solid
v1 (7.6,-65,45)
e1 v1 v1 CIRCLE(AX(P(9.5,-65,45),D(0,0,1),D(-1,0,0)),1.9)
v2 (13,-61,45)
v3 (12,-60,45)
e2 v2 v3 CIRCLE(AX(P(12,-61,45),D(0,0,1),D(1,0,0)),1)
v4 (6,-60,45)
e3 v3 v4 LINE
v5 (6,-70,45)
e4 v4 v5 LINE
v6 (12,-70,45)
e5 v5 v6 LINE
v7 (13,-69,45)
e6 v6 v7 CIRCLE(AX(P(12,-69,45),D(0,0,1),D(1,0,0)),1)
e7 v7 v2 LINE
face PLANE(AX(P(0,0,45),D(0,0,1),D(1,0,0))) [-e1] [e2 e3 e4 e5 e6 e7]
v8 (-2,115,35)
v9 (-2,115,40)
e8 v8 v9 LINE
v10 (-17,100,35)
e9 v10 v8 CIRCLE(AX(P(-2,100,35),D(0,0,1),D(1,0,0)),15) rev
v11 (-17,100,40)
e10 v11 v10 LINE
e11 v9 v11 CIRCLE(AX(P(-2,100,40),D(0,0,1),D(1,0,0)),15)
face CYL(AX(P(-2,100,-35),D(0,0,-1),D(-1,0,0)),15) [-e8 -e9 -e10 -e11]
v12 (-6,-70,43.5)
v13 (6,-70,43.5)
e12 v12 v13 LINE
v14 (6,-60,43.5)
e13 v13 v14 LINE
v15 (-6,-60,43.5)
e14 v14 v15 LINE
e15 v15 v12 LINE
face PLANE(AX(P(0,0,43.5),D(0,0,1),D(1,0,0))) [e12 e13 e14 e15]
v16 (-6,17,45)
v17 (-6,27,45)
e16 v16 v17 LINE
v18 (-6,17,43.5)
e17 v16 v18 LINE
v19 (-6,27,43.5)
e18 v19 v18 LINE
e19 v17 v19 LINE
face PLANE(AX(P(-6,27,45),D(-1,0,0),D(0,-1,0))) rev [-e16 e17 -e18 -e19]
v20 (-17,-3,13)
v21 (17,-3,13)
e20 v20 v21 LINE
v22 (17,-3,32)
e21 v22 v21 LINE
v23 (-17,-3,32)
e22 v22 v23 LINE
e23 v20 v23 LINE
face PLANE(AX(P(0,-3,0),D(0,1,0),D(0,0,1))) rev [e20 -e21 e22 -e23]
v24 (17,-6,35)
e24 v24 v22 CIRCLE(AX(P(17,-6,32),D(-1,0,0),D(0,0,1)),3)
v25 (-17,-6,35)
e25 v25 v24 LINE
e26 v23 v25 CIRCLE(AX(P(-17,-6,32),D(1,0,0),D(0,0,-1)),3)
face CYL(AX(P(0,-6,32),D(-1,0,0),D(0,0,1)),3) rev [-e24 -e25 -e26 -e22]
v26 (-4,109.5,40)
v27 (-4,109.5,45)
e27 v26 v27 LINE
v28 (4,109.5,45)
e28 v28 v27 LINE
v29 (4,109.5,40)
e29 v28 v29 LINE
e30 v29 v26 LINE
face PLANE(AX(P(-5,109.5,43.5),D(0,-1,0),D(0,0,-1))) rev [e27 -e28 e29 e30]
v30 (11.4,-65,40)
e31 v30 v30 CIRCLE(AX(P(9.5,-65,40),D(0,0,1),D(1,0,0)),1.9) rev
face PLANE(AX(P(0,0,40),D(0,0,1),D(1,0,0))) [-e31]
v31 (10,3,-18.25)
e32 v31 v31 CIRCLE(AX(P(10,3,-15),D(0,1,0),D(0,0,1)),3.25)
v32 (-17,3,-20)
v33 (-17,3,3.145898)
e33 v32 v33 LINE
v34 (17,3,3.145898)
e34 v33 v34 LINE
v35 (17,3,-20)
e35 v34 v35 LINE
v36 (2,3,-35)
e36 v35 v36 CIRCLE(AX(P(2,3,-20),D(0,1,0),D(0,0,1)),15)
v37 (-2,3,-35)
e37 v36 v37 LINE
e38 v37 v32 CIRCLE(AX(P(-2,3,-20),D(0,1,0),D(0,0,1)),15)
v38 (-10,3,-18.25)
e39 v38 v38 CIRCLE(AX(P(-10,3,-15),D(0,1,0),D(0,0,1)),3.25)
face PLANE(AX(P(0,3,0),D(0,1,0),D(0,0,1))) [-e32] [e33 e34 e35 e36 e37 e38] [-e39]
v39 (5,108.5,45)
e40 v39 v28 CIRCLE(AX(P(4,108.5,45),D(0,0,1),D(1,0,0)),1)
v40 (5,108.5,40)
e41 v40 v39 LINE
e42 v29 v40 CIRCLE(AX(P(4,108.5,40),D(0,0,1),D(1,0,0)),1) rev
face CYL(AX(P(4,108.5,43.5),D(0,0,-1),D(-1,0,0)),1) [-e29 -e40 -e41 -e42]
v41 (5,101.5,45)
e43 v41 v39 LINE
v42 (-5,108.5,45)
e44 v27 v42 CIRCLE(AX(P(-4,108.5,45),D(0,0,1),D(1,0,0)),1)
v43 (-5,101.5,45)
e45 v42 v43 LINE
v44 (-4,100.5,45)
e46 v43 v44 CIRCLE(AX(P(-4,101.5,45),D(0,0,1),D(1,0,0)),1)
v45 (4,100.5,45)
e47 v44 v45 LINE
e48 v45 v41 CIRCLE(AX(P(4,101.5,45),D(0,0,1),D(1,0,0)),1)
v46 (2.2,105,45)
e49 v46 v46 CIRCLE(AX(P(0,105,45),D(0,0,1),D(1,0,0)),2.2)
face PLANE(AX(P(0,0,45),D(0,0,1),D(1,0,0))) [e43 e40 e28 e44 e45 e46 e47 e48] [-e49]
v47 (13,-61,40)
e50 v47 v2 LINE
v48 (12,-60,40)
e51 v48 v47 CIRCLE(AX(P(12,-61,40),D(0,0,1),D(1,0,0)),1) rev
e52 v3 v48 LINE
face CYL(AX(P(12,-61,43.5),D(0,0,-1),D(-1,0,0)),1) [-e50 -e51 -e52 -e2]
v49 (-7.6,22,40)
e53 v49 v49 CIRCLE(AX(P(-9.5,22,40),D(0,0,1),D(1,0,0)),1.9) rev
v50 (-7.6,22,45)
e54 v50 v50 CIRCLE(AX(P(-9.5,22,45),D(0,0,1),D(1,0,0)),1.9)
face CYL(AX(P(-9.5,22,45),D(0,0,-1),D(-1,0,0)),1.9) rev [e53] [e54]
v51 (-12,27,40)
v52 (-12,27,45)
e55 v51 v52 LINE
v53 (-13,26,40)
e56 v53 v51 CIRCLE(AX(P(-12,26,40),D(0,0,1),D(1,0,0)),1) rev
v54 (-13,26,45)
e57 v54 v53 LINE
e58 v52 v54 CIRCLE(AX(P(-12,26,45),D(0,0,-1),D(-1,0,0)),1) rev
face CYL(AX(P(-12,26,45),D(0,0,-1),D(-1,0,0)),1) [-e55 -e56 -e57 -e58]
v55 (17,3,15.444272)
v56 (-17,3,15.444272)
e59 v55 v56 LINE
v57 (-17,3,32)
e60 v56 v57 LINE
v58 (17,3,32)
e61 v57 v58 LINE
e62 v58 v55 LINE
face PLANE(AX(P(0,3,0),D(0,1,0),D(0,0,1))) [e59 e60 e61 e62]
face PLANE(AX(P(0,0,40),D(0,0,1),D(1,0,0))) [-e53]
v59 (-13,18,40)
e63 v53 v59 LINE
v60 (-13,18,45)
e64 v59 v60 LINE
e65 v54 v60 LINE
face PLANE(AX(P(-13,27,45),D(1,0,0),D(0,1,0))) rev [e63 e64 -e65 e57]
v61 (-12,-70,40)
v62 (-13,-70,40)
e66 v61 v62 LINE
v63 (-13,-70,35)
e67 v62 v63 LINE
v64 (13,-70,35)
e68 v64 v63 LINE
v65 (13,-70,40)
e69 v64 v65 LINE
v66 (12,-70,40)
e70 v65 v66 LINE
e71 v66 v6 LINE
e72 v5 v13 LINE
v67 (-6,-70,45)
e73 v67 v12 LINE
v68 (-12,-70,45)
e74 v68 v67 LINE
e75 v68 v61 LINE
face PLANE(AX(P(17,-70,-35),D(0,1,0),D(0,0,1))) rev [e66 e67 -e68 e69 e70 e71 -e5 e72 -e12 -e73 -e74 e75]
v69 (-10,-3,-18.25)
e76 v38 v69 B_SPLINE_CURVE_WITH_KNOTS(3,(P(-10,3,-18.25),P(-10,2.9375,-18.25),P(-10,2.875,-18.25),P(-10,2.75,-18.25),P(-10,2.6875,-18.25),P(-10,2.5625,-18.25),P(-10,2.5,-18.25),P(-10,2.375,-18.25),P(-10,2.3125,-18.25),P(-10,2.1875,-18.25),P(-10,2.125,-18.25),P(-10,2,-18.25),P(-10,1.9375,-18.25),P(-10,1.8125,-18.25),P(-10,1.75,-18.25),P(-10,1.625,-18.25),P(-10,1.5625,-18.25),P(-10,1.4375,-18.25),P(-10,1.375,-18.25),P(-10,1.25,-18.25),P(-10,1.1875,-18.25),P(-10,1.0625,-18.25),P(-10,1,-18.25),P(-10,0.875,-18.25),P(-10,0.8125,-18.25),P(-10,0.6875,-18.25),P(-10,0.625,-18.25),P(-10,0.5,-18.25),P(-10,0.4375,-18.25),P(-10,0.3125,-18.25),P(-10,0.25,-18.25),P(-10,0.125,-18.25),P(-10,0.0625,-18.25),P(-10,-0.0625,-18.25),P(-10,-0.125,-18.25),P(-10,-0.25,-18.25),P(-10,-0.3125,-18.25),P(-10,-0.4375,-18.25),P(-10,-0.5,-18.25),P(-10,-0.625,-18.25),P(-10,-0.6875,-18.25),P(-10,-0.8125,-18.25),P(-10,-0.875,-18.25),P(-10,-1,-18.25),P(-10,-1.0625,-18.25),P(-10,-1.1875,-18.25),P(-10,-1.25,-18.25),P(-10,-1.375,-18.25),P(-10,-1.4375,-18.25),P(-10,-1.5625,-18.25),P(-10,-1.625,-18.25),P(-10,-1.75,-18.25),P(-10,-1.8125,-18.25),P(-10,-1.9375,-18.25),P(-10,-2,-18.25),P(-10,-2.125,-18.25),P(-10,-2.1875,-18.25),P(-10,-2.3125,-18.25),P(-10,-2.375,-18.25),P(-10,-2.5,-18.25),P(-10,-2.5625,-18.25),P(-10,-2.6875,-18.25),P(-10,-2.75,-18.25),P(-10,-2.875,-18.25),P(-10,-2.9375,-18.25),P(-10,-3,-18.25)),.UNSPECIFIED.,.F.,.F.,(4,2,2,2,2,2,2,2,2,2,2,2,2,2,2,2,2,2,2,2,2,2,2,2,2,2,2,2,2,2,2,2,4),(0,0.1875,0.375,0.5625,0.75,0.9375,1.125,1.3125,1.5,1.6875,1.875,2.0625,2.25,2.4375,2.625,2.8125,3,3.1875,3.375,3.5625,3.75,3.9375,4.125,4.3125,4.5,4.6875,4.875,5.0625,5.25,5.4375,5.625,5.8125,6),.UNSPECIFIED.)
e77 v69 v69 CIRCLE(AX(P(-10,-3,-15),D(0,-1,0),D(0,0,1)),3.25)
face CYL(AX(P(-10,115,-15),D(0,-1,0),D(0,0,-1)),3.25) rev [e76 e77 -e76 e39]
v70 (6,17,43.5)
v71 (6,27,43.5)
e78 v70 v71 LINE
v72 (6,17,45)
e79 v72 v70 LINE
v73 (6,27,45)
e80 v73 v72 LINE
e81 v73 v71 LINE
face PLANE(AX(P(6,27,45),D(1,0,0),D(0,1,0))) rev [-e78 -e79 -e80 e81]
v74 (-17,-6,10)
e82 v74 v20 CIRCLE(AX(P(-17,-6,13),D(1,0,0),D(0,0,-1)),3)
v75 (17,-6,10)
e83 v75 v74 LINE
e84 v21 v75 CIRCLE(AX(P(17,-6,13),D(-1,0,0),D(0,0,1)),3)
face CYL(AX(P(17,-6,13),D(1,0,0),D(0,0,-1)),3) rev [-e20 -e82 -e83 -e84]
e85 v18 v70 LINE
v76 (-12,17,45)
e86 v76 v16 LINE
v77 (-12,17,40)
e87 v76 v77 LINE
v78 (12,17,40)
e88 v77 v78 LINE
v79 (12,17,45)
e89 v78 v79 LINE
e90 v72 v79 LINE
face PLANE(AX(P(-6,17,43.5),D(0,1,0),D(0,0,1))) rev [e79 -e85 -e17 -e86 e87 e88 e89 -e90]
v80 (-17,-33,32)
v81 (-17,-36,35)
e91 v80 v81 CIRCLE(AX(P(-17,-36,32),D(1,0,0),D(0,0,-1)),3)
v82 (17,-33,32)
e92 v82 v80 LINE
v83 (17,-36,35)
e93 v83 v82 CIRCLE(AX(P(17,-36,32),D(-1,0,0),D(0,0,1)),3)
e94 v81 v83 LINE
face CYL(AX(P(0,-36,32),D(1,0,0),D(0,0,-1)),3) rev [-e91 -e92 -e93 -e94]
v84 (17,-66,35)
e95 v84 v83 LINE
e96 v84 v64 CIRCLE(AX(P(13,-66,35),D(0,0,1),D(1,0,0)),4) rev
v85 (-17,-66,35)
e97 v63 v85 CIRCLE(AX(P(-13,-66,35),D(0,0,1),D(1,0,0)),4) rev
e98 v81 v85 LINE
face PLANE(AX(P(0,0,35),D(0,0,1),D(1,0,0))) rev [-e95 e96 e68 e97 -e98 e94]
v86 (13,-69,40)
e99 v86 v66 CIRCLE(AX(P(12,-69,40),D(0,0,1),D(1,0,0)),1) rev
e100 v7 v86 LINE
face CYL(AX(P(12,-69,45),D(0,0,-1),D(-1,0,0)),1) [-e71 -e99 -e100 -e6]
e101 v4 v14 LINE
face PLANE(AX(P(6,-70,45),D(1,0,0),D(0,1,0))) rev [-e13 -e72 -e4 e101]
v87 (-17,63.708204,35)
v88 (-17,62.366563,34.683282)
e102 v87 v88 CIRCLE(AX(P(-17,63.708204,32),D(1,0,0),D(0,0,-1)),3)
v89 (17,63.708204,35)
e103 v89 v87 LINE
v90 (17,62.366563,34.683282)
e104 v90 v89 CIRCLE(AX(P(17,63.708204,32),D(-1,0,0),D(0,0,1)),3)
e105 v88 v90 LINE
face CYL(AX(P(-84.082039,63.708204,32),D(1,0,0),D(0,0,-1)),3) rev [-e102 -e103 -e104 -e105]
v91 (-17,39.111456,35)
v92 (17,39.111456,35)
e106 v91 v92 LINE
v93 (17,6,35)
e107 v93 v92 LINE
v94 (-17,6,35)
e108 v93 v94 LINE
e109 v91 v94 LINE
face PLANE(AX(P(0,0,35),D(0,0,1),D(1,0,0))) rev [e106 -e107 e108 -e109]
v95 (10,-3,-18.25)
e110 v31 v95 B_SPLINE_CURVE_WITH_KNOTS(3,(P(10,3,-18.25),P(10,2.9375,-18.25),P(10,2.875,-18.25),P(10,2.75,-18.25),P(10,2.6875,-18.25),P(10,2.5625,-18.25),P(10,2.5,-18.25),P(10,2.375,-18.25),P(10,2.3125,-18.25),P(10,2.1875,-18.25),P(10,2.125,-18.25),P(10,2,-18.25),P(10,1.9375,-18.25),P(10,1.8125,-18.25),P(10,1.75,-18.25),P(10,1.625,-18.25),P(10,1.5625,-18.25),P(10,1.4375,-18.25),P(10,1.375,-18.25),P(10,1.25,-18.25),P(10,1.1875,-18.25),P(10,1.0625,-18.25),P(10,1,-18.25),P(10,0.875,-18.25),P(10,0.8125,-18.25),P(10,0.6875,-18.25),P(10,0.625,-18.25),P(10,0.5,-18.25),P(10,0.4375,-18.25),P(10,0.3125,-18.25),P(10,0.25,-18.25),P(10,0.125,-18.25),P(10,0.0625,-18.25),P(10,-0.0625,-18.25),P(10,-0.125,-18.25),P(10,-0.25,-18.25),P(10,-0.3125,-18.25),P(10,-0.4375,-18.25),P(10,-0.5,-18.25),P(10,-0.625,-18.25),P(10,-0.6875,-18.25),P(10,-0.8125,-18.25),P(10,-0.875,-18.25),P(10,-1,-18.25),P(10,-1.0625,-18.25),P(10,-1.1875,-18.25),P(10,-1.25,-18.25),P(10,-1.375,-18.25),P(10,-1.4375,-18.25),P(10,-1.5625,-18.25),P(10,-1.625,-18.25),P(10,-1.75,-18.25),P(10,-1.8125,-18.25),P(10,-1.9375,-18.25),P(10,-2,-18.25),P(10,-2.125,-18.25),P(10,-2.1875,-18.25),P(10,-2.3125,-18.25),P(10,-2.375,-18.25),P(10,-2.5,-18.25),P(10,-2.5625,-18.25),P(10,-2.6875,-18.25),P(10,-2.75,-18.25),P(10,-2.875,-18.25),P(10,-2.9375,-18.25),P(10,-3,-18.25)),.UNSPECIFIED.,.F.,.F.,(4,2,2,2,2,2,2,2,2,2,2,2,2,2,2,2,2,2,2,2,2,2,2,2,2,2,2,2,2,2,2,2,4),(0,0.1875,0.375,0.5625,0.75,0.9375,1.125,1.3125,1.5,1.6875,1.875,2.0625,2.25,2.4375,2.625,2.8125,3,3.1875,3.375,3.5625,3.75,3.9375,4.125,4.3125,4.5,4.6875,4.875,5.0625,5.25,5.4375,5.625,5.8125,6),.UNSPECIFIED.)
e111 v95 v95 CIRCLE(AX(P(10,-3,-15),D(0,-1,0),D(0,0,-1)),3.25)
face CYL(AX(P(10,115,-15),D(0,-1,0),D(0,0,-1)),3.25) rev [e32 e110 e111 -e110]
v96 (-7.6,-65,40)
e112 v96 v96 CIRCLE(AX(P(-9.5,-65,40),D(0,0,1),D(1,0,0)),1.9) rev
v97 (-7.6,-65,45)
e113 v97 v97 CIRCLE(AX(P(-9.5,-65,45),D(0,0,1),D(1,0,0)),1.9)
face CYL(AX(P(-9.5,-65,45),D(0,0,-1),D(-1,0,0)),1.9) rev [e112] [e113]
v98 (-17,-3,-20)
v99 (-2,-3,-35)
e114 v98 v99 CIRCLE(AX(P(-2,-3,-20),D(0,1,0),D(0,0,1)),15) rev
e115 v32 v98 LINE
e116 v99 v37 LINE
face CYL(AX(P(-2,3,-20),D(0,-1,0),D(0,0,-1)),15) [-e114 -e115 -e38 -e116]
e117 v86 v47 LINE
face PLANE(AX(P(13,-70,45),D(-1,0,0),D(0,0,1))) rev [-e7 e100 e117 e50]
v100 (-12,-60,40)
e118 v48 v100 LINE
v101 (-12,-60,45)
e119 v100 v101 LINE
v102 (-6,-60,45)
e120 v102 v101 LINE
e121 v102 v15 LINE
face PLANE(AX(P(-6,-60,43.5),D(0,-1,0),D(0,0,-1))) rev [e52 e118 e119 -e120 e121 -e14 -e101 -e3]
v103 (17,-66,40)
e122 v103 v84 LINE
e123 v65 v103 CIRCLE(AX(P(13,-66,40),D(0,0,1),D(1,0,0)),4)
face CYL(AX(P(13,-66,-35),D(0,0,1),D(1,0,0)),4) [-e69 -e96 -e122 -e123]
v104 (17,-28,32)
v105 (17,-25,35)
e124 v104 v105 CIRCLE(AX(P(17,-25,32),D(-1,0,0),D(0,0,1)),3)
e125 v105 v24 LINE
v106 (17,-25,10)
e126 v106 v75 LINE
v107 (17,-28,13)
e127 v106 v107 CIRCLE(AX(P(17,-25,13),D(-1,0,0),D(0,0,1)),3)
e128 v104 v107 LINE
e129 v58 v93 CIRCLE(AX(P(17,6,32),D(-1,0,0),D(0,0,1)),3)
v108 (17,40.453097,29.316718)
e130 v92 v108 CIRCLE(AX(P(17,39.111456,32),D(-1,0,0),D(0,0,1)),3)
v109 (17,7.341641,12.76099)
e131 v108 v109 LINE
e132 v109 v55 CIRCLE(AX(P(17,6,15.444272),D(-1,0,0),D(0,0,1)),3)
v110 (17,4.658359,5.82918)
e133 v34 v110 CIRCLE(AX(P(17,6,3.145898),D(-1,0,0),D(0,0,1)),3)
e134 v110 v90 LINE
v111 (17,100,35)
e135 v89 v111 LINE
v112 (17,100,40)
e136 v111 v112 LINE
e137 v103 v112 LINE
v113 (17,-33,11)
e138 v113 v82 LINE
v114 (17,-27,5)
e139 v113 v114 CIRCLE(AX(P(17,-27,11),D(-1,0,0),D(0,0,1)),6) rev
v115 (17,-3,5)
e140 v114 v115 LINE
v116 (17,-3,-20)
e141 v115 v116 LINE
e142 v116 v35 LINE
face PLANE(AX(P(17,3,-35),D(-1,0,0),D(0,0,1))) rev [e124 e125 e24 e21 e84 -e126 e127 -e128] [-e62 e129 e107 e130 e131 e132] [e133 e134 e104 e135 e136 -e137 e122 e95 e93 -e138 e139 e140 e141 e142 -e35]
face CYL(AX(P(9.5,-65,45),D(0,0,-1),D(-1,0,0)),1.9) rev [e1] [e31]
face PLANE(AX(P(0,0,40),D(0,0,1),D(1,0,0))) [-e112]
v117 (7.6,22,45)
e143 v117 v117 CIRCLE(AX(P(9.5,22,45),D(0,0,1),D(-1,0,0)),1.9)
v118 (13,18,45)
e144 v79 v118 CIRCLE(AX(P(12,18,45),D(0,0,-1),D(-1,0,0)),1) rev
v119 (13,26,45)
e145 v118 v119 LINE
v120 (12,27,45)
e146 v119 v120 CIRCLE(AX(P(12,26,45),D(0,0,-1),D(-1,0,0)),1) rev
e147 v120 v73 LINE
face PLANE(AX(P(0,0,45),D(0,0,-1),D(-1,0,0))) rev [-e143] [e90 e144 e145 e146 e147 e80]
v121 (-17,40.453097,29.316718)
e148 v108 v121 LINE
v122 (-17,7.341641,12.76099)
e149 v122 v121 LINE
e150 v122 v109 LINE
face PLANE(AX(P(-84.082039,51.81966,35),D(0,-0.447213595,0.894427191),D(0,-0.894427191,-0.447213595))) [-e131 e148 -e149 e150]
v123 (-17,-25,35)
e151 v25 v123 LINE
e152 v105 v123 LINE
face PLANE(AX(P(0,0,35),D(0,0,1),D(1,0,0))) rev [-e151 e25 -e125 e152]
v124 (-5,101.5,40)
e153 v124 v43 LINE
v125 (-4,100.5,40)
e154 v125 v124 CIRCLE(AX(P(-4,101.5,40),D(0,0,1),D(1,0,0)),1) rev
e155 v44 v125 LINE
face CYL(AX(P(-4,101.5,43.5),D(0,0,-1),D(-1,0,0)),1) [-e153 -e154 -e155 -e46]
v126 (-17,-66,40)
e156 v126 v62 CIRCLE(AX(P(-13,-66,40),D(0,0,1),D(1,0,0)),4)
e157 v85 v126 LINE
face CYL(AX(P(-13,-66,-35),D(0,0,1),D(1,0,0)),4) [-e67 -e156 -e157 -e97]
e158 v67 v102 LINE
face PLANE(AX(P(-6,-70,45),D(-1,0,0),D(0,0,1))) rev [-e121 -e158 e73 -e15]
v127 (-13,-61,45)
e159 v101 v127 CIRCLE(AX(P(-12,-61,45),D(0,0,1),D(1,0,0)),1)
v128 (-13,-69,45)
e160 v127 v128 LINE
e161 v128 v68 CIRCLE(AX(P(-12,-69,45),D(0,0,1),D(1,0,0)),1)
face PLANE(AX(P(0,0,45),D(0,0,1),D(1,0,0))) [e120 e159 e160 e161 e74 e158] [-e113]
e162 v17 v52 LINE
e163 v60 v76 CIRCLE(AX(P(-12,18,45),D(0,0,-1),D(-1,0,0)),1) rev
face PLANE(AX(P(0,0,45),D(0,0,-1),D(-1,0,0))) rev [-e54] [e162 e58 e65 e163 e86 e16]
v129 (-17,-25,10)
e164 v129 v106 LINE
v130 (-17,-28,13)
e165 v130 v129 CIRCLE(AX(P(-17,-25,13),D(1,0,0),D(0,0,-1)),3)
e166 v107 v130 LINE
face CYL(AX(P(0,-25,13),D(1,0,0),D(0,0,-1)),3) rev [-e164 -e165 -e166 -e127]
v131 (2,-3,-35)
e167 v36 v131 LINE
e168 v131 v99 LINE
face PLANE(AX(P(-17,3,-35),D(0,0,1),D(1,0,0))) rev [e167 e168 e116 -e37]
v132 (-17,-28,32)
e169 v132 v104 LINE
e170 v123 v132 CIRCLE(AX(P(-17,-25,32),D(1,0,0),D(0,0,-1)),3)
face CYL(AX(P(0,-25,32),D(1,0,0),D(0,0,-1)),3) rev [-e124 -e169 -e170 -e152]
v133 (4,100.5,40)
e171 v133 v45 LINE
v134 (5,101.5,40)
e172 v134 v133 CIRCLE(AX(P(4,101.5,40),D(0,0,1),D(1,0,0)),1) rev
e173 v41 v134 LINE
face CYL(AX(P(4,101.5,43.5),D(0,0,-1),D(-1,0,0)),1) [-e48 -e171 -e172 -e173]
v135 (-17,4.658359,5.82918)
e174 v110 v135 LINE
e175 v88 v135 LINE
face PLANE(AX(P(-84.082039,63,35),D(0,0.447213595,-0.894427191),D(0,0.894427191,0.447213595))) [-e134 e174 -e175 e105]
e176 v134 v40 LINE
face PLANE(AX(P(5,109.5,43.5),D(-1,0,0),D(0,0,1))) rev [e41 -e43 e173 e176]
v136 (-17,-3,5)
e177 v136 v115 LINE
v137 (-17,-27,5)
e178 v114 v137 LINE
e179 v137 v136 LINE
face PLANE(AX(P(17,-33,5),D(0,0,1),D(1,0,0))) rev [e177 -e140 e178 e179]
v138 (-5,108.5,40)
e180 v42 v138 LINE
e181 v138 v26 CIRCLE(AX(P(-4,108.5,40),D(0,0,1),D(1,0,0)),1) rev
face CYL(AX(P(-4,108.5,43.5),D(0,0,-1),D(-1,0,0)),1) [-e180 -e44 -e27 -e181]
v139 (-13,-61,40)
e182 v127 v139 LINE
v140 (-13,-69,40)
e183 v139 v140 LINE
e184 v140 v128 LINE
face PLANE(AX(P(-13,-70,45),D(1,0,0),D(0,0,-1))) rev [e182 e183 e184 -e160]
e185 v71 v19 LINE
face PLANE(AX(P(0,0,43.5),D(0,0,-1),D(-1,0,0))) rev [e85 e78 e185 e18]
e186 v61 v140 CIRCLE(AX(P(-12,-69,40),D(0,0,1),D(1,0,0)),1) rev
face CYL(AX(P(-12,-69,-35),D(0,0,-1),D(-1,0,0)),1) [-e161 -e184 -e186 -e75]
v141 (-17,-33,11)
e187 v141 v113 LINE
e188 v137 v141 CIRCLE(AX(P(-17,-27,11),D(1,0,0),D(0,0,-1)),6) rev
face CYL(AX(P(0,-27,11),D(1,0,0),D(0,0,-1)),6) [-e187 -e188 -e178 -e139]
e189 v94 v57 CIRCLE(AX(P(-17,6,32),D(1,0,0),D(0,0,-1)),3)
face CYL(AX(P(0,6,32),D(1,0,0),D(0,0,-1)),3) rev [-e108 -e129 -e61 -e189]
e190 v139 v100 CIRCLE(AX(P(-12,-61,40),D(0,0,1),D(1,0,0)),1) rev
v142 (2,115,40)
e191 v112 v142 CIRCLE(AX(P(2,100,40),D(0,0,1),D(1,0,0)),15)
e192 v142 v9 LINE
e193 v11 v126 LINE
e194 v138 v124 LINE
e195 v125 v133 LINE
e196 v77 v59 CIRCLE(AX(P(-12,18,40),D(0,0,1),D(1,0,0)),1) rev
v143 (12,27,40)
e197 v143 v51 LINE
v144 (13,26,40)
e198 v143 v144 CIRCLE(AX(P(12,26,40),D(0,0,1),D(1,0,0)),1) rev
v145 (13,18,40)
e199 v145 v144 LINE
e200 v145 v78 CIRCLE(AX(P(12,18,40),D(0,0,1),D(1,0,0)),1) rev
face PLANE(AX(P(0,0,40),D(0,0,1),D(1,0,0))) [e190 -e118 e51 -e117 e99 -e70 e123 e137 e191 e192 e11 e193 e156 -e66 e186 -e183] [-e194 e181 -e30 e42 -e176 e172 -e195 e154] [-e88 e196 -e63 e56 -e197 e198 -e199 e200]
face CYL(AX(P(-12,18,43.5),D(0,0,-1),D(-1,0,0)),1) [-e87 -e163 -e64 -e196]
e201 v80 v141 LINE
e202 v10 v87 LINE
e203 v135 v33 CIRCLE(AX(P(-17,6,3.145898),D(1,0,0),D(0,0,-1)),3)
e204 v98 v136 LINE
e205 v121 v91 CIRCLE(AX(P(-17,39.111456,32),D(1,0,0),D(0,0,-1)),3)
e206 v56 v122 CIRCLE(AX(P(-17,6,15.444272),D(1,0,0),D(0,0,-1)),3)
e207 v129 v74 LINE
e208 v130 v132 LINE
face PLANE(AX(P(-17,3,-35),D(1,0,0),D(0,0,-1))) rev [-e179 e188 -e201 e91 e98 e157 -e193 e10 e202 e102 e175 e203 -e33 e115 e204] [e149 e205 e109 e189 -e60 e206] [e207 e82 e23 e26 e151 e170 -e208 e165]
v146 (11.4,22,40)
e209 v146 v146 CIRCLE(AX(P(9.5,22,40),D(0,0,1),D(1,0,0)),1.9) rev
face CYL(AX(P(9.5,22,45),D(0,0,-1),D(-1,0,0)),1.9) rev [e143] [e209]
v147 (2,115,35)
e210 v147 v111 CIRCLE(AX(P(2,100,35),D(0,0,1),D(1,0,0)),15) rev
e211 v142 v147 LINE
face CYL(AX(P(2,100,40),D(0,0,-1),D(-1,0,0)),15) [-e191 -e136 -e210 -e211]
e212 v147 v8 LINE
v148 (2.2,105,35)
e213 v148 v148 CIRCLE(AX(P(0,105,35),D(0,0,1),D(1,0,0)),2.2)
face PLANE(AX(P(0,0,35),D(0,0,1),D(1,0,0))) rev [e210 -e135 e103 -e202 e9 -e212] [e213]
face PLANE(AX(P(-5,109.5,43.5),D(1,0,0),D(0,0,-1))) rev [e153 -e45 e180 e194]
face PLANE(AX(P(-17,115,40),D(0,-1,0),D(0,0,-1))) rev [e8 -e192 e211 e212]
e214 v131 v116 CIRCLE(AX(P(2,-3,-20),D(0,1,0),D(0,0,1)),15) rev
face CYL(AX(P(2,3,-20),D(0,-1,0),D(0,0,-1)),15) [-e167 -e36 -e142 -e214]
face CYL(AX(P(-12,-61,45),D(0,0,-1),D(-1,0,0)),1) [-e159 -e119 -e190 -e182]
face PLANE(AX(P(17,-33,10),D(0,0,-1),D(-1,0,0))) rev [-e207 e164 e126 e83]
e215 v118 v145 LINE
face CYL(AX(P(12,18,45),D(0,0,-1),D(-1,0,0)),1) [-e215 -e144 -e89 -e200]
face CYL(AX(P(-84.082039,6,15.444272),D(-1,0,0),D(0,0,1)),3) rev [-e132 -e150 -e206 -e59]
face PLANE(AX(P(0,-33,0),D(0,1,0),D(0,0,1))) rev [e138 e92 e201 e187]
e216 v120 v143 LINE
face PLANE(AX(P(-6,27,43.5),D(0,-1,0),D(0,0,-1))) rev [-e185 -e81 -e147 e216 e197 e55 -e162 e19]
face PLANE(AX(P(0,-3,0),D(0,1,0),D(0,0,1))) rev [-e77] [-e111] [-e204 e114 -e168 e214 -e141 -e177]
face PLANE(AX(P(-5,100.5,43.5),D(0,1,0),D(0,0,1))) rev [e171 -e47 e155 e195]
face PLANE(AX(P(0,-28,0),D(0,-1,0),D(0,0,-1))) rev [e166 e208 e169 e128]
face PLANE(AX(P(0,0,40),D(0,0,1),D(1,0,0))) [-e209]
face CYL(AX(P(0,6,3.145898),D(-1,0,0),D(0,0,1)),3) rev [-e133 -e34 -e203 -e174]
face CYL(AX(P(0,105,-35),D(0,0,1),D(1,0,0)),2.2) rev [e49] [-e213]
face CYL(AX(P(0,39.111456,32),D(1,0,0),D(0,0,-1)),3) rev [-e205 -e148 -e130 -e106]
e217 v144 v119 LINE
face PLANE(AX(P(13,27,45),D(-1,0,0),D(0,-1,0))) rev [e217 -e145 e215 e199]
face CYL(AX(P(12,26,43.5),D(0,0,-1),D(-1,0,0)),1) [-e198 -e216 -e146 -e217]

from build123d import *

# Parameters (mm, degrees)
EXTRUDE_1_DEPTH      = 3
EXTRUDE_1_DEPTH_BACK = 3
SKETCH_1_W           = 34
SKETCH_1_H           = 70
SKETCH_3_W           = 34
SKETCH_3_H           = 230
EXTRUDE_2_DEPTH      = 5
SKETCH_4_W           = 34
SKETCH_4_H           = 5
EXTRUDE_3_DEPTH      = 30
EXTRUDE_START        = -5
EXTRUDE_4_OUTLINE_W  = 34
EXTRUDE_4_OUTLINE_H  = 25
EXTRUDE_4_DEPTH      = 5
SKETCH_7_R           = 2.2
CUT_EXTRUDE_1_DEPTH  = 139.343774706
SKETCH_9_R           = 3.25
CUT_EXTRUDE_3_DEPTH  = 126.749751491
EXTRUDE_5_DEPTH      = 34
SKETCH_12_W          = 37
SKETCH_12_H          = 52.36766615
CUT_EXTRUDE_5_DEPTH  = 139.343774706
EXTRUDE_START_2      = 3.5
SKETCH_13_W          = 12
SKETCH_13_H          = 10
SKETCH_13_W_2        = 10
SKETCH_13_H_2        = 9
SKETCH_13_R          = 2.2
EXTRUDE_6_DEPTH      = 3.5
EXTRUDE_START_3      = 1.5
SKETCH_14_W          = 10
SKETCH_14_H          = 9
SKETCH_14_R          = 2.2
EXTRUDE_7_DEPTH      = 1.5
SKETCH_15_W          = 7
SKETCH_15_H          = 10
SKETCH_15_R          = 1.9
EXTRUDE_8_DEPTH      = 5
FILLET_2_R           = 15
FILLET_3_R           = 4
FILLET_4_R           = 3
FILLET_5_R           = 6
FILLET_6_R           = 1


# Read off the part's stored shape, not the designer's step: 凸台-拉伸4
with BuildPart() as part:
    # 草图1 → 凸台-拉伸1 (new, two sides: drawn at the far end of the back side and taken through both)
    with BuildSketch(Plane(origin=(0, 0, 0), x_dir=(1, 0, 0), z_dir=(0, 1, 0)).offset(-EXTRUDE_1_DEPTH_BACK)):
        Rectangle(SKETCH_1_W, SKETCH_1_H)
    extrude(amount=EXTRUDE_1_DEPTH + EXTRUDE_1_DEPTH_BACK)

    # 草图3 → 凸台-拉伸2 (add)
    with BuildSketch(Plane.XY.offset(35)):
        Rectangle(SKETCH_3_W, SKETCH_3_H)
    extrude(amount=EXTRUDE_2_DEPTH)

    # 草图4 → 凸台-拉伸3 (add)
    with BuildSketch(Plane.XZ.offset(3)):
        with Locations((0, 7.5)):
            Rectangle(SKETCH_4_W, SKETCH_4_H)
    extrude(amount=EXTRUDE_3_DEPTH)

    # 凸台-拉伸4 outline → 凸台-拉伸4 (add)
    with BuildSketch(Plane.XZ.offset(33).offset(EXTRUDE_START)):
        with Locations((0, 22.5)):
            Rectangle(EXTRUDE_4_OUTLINE_W, EXTRUDE_4_OUTLINE_H)
    extrude(amount=EXTRUDE_4_DEPTH)

    # 草图7 → 切除-拉伸1 (cut, through all)
    with BuildSketch(Plane.XY.offset(40)):
        with Locations((0, -105)):
            Circle(SKETCH_7_R)
        with Locations((0, 105)):
            Circle(SKETCH_7_R)
    extrude(amount=-CUT_EXTRUDE_1_DEPTH, mode=Mode.SUBTRACT)

    # 草图9 → 切除-拉伸3 (cut, through all)
    with BuildSketch(Plane.XZ.offset(3)):
        with Locations(Location((10, -15, 0), (0, 0, 270))):
            Circle(SKETCH_9_R)
        with Locations(Location((-10, -15, 0), (0, 0, 270))):
            Circle(SKETCH_9_R)
    extrude(amount=-CUT_EXTRUDE_3_DEPTH, mode=Mode.SUBTRACT)

    # 草图10 → 凸台-拉伸5 (add)
    with BuildSketch(Plane(origin=(17, 0, 0), x_dir=(0, 0, -1), z_dir=(1, 0, 0))):
        Polygon((-35, 51.819660113), (-35, 63), (-5, 3), (-10.590169944, 3), align=None)
    extrude(amount=-EXTRUDE_5_DEPTH)

    # 草图12 → 切除-拉伸5 (cut, through all)
    with BuildSketch(Plane.XY.offset(40)):
        with Locations((-1.5, -96.183833075)):
            Rectangle(SKETCH_12_W, SKETCH_12_H)
    extrude(amount=-CUT_EXTRUDE_5_DEPTH, mode=Mode.SUBTRACT)

    # 草图13 → 凸台-拉伸6 (add)
    # profile 1 of 3: a face of its own
    with BuildSketch(Plane.XY.offset(40).offset(EXTRUDE_START_2)):
        with Locations((0, -65)):
            Rectangle(SKETCH_13_W, SKETCH_13_H)
    # profile 2 of 3: a face of its own
    with BuildSketch(Plane.XY.offset(40).offset(EXTRUDE_START_2)):
        with Locations((0, 22)):
            Rectangle(SKETCH_13_W, SKETCH_13_H)
    # profile 3 of 3: a face of its own
    with BuildSketch(Plane.XY.offset(40).offset(EXTRUDE_START_2)):
        with Locations((0, 105)):
            Rectangle(SKETCH_13_W_2, SKETCH_13_H_2)
        with Locations((0, 105)):
            Circle(SKETCH_13_R, mode=Mode.SUBTRACT)
    extrude(amount=-EXTRUDE_6_DEPTH)

    # 草图14 → 凸台-拉伸7 (add)
    with BuildSketch(Plane.XY.offset(43.5).offset(EXTRUDE_START_3)):
        with Locations((0, 105)):
            Rectangle(SKETCH_14_W, SKETCH_14_H)
        with Locations((0, 105)):
            Circle(SKETCH_14_R, mode=Mode.SUBTRACT)
    extrude(amount=-EXTRUDE_7_DEPTH)

    # 草图15 → 凸台-拉伸8 (add)
    # profile 1 of 4: a face of its own
    with BuildSketch(Plane.XY.offset(40)):
        with Locations((-9.5, 22)):
            Rectangle(SKETCH_15_W, SKETCH_15_H)
        with Locations((-9.5, 22)):
            Circle(SKETCH_15_R, mode=Mode.SUBTRACT)
    # profile 2 of 4: a face of its own
    with BuildSketch(Plane.XY.offset(40)):
        with Locations((-9.5, -65)):
            Rectangle(SKETCH_15_W, SKETCH_15_H)
        with Locations((-9.5, -65)):
            Circle(SKETCH_15_R, mode=Mode.SUBTRACT)
    # profile 3 of 4: a face of its own
    with BuildSketch(Plane.XY.offset(40)):
        with Locations((9.5, 22)):
            Rectangle(SKETCH_15_W, SKETCH_15_H)
        with Locations(Location((9.5, 22, 0), (0, 0, 180))):
            Circle(SKETCH_15_R, mode=Mode.SUBTRACT)
    # profile 4 of 4: a face of its own
    with BuildSketch(Plane.XY.offset(40)):
        with Locations((9.5, -65)):
            Rectangle(SKETCH_15_W, SKETCH_15_H)
        with Locations(Location((9.5, -65, 0), (0, 0, 180))):
            Circle(SKETCH_15_R, mode=Mode.SUBTRACT)
    extrude(amount=EXTRUDE_8_DEPTH)

    # 圆角2
    fillet_2_edges = [part.edges().sort_by_distance(p)[0] for p in [
        (17, 115, 37.5),
        (-17, 115, 37.5),
        (-17, 0, -35),
        (17, 0, -35),
    ]]
    fillet(fillet_2_edges, radius=FILLET_2_R)

    # 圆角3
    fillet_3_edges = [part.edges().sort_by_distance(p)[0] for p in [
        (-17, -70, 37.5),
        (17, -70, 37.5),
    ]]
    fillet(fillet_3_edges, radius=FILLET_3_R)

    # 圆角4
    fillet_4_edges = [part.edges().sort_by_distance(p)[0] for p in [
        (0, 3, 5),
        (0, 3, 10.590169944),
        (0, 51.819660113, 35),
        (0, 63, 35),
        (0, -3, 35),
        (0, 3, 35),
        (0, -3, 10),
        (0, -28, 10),
        (0, -33, 35),
        (0, -28, 35),
    ]]
    fillet(fillet_4_edges, radius=FILLET_4_R)

    # 圆角5
    fillet_5_edges = [part.edges().sort_by_distance(p)[0] for p in [
        (0, -33, 5),
    ]]
    fillet(fillet_5_edges, radius=FILLET_5_R)

    # 圆角6
    fillet_6_edges = [part.edges().sort_by_distance(p)[0] for p in [
        (5, 100.5, 42.5),
        (5, 109.5, 42.5),
        (-5, 109.5, 42.5),
        (-5, 100.5, 42.5),
        (-13, 27, 42.5),
        (-13, 17, 42.5),
        (-13, -60, 42.5),
        (-13, -70, 42.5),
        (13, 27, 42.5),
        (13, 17, 42.5),
        (13, -70, 42.5),
        (13, -60, 42.5),
    ]]
    fillet(fillet_6_edges, radius=FILLET_6_R)


solid = part.part
